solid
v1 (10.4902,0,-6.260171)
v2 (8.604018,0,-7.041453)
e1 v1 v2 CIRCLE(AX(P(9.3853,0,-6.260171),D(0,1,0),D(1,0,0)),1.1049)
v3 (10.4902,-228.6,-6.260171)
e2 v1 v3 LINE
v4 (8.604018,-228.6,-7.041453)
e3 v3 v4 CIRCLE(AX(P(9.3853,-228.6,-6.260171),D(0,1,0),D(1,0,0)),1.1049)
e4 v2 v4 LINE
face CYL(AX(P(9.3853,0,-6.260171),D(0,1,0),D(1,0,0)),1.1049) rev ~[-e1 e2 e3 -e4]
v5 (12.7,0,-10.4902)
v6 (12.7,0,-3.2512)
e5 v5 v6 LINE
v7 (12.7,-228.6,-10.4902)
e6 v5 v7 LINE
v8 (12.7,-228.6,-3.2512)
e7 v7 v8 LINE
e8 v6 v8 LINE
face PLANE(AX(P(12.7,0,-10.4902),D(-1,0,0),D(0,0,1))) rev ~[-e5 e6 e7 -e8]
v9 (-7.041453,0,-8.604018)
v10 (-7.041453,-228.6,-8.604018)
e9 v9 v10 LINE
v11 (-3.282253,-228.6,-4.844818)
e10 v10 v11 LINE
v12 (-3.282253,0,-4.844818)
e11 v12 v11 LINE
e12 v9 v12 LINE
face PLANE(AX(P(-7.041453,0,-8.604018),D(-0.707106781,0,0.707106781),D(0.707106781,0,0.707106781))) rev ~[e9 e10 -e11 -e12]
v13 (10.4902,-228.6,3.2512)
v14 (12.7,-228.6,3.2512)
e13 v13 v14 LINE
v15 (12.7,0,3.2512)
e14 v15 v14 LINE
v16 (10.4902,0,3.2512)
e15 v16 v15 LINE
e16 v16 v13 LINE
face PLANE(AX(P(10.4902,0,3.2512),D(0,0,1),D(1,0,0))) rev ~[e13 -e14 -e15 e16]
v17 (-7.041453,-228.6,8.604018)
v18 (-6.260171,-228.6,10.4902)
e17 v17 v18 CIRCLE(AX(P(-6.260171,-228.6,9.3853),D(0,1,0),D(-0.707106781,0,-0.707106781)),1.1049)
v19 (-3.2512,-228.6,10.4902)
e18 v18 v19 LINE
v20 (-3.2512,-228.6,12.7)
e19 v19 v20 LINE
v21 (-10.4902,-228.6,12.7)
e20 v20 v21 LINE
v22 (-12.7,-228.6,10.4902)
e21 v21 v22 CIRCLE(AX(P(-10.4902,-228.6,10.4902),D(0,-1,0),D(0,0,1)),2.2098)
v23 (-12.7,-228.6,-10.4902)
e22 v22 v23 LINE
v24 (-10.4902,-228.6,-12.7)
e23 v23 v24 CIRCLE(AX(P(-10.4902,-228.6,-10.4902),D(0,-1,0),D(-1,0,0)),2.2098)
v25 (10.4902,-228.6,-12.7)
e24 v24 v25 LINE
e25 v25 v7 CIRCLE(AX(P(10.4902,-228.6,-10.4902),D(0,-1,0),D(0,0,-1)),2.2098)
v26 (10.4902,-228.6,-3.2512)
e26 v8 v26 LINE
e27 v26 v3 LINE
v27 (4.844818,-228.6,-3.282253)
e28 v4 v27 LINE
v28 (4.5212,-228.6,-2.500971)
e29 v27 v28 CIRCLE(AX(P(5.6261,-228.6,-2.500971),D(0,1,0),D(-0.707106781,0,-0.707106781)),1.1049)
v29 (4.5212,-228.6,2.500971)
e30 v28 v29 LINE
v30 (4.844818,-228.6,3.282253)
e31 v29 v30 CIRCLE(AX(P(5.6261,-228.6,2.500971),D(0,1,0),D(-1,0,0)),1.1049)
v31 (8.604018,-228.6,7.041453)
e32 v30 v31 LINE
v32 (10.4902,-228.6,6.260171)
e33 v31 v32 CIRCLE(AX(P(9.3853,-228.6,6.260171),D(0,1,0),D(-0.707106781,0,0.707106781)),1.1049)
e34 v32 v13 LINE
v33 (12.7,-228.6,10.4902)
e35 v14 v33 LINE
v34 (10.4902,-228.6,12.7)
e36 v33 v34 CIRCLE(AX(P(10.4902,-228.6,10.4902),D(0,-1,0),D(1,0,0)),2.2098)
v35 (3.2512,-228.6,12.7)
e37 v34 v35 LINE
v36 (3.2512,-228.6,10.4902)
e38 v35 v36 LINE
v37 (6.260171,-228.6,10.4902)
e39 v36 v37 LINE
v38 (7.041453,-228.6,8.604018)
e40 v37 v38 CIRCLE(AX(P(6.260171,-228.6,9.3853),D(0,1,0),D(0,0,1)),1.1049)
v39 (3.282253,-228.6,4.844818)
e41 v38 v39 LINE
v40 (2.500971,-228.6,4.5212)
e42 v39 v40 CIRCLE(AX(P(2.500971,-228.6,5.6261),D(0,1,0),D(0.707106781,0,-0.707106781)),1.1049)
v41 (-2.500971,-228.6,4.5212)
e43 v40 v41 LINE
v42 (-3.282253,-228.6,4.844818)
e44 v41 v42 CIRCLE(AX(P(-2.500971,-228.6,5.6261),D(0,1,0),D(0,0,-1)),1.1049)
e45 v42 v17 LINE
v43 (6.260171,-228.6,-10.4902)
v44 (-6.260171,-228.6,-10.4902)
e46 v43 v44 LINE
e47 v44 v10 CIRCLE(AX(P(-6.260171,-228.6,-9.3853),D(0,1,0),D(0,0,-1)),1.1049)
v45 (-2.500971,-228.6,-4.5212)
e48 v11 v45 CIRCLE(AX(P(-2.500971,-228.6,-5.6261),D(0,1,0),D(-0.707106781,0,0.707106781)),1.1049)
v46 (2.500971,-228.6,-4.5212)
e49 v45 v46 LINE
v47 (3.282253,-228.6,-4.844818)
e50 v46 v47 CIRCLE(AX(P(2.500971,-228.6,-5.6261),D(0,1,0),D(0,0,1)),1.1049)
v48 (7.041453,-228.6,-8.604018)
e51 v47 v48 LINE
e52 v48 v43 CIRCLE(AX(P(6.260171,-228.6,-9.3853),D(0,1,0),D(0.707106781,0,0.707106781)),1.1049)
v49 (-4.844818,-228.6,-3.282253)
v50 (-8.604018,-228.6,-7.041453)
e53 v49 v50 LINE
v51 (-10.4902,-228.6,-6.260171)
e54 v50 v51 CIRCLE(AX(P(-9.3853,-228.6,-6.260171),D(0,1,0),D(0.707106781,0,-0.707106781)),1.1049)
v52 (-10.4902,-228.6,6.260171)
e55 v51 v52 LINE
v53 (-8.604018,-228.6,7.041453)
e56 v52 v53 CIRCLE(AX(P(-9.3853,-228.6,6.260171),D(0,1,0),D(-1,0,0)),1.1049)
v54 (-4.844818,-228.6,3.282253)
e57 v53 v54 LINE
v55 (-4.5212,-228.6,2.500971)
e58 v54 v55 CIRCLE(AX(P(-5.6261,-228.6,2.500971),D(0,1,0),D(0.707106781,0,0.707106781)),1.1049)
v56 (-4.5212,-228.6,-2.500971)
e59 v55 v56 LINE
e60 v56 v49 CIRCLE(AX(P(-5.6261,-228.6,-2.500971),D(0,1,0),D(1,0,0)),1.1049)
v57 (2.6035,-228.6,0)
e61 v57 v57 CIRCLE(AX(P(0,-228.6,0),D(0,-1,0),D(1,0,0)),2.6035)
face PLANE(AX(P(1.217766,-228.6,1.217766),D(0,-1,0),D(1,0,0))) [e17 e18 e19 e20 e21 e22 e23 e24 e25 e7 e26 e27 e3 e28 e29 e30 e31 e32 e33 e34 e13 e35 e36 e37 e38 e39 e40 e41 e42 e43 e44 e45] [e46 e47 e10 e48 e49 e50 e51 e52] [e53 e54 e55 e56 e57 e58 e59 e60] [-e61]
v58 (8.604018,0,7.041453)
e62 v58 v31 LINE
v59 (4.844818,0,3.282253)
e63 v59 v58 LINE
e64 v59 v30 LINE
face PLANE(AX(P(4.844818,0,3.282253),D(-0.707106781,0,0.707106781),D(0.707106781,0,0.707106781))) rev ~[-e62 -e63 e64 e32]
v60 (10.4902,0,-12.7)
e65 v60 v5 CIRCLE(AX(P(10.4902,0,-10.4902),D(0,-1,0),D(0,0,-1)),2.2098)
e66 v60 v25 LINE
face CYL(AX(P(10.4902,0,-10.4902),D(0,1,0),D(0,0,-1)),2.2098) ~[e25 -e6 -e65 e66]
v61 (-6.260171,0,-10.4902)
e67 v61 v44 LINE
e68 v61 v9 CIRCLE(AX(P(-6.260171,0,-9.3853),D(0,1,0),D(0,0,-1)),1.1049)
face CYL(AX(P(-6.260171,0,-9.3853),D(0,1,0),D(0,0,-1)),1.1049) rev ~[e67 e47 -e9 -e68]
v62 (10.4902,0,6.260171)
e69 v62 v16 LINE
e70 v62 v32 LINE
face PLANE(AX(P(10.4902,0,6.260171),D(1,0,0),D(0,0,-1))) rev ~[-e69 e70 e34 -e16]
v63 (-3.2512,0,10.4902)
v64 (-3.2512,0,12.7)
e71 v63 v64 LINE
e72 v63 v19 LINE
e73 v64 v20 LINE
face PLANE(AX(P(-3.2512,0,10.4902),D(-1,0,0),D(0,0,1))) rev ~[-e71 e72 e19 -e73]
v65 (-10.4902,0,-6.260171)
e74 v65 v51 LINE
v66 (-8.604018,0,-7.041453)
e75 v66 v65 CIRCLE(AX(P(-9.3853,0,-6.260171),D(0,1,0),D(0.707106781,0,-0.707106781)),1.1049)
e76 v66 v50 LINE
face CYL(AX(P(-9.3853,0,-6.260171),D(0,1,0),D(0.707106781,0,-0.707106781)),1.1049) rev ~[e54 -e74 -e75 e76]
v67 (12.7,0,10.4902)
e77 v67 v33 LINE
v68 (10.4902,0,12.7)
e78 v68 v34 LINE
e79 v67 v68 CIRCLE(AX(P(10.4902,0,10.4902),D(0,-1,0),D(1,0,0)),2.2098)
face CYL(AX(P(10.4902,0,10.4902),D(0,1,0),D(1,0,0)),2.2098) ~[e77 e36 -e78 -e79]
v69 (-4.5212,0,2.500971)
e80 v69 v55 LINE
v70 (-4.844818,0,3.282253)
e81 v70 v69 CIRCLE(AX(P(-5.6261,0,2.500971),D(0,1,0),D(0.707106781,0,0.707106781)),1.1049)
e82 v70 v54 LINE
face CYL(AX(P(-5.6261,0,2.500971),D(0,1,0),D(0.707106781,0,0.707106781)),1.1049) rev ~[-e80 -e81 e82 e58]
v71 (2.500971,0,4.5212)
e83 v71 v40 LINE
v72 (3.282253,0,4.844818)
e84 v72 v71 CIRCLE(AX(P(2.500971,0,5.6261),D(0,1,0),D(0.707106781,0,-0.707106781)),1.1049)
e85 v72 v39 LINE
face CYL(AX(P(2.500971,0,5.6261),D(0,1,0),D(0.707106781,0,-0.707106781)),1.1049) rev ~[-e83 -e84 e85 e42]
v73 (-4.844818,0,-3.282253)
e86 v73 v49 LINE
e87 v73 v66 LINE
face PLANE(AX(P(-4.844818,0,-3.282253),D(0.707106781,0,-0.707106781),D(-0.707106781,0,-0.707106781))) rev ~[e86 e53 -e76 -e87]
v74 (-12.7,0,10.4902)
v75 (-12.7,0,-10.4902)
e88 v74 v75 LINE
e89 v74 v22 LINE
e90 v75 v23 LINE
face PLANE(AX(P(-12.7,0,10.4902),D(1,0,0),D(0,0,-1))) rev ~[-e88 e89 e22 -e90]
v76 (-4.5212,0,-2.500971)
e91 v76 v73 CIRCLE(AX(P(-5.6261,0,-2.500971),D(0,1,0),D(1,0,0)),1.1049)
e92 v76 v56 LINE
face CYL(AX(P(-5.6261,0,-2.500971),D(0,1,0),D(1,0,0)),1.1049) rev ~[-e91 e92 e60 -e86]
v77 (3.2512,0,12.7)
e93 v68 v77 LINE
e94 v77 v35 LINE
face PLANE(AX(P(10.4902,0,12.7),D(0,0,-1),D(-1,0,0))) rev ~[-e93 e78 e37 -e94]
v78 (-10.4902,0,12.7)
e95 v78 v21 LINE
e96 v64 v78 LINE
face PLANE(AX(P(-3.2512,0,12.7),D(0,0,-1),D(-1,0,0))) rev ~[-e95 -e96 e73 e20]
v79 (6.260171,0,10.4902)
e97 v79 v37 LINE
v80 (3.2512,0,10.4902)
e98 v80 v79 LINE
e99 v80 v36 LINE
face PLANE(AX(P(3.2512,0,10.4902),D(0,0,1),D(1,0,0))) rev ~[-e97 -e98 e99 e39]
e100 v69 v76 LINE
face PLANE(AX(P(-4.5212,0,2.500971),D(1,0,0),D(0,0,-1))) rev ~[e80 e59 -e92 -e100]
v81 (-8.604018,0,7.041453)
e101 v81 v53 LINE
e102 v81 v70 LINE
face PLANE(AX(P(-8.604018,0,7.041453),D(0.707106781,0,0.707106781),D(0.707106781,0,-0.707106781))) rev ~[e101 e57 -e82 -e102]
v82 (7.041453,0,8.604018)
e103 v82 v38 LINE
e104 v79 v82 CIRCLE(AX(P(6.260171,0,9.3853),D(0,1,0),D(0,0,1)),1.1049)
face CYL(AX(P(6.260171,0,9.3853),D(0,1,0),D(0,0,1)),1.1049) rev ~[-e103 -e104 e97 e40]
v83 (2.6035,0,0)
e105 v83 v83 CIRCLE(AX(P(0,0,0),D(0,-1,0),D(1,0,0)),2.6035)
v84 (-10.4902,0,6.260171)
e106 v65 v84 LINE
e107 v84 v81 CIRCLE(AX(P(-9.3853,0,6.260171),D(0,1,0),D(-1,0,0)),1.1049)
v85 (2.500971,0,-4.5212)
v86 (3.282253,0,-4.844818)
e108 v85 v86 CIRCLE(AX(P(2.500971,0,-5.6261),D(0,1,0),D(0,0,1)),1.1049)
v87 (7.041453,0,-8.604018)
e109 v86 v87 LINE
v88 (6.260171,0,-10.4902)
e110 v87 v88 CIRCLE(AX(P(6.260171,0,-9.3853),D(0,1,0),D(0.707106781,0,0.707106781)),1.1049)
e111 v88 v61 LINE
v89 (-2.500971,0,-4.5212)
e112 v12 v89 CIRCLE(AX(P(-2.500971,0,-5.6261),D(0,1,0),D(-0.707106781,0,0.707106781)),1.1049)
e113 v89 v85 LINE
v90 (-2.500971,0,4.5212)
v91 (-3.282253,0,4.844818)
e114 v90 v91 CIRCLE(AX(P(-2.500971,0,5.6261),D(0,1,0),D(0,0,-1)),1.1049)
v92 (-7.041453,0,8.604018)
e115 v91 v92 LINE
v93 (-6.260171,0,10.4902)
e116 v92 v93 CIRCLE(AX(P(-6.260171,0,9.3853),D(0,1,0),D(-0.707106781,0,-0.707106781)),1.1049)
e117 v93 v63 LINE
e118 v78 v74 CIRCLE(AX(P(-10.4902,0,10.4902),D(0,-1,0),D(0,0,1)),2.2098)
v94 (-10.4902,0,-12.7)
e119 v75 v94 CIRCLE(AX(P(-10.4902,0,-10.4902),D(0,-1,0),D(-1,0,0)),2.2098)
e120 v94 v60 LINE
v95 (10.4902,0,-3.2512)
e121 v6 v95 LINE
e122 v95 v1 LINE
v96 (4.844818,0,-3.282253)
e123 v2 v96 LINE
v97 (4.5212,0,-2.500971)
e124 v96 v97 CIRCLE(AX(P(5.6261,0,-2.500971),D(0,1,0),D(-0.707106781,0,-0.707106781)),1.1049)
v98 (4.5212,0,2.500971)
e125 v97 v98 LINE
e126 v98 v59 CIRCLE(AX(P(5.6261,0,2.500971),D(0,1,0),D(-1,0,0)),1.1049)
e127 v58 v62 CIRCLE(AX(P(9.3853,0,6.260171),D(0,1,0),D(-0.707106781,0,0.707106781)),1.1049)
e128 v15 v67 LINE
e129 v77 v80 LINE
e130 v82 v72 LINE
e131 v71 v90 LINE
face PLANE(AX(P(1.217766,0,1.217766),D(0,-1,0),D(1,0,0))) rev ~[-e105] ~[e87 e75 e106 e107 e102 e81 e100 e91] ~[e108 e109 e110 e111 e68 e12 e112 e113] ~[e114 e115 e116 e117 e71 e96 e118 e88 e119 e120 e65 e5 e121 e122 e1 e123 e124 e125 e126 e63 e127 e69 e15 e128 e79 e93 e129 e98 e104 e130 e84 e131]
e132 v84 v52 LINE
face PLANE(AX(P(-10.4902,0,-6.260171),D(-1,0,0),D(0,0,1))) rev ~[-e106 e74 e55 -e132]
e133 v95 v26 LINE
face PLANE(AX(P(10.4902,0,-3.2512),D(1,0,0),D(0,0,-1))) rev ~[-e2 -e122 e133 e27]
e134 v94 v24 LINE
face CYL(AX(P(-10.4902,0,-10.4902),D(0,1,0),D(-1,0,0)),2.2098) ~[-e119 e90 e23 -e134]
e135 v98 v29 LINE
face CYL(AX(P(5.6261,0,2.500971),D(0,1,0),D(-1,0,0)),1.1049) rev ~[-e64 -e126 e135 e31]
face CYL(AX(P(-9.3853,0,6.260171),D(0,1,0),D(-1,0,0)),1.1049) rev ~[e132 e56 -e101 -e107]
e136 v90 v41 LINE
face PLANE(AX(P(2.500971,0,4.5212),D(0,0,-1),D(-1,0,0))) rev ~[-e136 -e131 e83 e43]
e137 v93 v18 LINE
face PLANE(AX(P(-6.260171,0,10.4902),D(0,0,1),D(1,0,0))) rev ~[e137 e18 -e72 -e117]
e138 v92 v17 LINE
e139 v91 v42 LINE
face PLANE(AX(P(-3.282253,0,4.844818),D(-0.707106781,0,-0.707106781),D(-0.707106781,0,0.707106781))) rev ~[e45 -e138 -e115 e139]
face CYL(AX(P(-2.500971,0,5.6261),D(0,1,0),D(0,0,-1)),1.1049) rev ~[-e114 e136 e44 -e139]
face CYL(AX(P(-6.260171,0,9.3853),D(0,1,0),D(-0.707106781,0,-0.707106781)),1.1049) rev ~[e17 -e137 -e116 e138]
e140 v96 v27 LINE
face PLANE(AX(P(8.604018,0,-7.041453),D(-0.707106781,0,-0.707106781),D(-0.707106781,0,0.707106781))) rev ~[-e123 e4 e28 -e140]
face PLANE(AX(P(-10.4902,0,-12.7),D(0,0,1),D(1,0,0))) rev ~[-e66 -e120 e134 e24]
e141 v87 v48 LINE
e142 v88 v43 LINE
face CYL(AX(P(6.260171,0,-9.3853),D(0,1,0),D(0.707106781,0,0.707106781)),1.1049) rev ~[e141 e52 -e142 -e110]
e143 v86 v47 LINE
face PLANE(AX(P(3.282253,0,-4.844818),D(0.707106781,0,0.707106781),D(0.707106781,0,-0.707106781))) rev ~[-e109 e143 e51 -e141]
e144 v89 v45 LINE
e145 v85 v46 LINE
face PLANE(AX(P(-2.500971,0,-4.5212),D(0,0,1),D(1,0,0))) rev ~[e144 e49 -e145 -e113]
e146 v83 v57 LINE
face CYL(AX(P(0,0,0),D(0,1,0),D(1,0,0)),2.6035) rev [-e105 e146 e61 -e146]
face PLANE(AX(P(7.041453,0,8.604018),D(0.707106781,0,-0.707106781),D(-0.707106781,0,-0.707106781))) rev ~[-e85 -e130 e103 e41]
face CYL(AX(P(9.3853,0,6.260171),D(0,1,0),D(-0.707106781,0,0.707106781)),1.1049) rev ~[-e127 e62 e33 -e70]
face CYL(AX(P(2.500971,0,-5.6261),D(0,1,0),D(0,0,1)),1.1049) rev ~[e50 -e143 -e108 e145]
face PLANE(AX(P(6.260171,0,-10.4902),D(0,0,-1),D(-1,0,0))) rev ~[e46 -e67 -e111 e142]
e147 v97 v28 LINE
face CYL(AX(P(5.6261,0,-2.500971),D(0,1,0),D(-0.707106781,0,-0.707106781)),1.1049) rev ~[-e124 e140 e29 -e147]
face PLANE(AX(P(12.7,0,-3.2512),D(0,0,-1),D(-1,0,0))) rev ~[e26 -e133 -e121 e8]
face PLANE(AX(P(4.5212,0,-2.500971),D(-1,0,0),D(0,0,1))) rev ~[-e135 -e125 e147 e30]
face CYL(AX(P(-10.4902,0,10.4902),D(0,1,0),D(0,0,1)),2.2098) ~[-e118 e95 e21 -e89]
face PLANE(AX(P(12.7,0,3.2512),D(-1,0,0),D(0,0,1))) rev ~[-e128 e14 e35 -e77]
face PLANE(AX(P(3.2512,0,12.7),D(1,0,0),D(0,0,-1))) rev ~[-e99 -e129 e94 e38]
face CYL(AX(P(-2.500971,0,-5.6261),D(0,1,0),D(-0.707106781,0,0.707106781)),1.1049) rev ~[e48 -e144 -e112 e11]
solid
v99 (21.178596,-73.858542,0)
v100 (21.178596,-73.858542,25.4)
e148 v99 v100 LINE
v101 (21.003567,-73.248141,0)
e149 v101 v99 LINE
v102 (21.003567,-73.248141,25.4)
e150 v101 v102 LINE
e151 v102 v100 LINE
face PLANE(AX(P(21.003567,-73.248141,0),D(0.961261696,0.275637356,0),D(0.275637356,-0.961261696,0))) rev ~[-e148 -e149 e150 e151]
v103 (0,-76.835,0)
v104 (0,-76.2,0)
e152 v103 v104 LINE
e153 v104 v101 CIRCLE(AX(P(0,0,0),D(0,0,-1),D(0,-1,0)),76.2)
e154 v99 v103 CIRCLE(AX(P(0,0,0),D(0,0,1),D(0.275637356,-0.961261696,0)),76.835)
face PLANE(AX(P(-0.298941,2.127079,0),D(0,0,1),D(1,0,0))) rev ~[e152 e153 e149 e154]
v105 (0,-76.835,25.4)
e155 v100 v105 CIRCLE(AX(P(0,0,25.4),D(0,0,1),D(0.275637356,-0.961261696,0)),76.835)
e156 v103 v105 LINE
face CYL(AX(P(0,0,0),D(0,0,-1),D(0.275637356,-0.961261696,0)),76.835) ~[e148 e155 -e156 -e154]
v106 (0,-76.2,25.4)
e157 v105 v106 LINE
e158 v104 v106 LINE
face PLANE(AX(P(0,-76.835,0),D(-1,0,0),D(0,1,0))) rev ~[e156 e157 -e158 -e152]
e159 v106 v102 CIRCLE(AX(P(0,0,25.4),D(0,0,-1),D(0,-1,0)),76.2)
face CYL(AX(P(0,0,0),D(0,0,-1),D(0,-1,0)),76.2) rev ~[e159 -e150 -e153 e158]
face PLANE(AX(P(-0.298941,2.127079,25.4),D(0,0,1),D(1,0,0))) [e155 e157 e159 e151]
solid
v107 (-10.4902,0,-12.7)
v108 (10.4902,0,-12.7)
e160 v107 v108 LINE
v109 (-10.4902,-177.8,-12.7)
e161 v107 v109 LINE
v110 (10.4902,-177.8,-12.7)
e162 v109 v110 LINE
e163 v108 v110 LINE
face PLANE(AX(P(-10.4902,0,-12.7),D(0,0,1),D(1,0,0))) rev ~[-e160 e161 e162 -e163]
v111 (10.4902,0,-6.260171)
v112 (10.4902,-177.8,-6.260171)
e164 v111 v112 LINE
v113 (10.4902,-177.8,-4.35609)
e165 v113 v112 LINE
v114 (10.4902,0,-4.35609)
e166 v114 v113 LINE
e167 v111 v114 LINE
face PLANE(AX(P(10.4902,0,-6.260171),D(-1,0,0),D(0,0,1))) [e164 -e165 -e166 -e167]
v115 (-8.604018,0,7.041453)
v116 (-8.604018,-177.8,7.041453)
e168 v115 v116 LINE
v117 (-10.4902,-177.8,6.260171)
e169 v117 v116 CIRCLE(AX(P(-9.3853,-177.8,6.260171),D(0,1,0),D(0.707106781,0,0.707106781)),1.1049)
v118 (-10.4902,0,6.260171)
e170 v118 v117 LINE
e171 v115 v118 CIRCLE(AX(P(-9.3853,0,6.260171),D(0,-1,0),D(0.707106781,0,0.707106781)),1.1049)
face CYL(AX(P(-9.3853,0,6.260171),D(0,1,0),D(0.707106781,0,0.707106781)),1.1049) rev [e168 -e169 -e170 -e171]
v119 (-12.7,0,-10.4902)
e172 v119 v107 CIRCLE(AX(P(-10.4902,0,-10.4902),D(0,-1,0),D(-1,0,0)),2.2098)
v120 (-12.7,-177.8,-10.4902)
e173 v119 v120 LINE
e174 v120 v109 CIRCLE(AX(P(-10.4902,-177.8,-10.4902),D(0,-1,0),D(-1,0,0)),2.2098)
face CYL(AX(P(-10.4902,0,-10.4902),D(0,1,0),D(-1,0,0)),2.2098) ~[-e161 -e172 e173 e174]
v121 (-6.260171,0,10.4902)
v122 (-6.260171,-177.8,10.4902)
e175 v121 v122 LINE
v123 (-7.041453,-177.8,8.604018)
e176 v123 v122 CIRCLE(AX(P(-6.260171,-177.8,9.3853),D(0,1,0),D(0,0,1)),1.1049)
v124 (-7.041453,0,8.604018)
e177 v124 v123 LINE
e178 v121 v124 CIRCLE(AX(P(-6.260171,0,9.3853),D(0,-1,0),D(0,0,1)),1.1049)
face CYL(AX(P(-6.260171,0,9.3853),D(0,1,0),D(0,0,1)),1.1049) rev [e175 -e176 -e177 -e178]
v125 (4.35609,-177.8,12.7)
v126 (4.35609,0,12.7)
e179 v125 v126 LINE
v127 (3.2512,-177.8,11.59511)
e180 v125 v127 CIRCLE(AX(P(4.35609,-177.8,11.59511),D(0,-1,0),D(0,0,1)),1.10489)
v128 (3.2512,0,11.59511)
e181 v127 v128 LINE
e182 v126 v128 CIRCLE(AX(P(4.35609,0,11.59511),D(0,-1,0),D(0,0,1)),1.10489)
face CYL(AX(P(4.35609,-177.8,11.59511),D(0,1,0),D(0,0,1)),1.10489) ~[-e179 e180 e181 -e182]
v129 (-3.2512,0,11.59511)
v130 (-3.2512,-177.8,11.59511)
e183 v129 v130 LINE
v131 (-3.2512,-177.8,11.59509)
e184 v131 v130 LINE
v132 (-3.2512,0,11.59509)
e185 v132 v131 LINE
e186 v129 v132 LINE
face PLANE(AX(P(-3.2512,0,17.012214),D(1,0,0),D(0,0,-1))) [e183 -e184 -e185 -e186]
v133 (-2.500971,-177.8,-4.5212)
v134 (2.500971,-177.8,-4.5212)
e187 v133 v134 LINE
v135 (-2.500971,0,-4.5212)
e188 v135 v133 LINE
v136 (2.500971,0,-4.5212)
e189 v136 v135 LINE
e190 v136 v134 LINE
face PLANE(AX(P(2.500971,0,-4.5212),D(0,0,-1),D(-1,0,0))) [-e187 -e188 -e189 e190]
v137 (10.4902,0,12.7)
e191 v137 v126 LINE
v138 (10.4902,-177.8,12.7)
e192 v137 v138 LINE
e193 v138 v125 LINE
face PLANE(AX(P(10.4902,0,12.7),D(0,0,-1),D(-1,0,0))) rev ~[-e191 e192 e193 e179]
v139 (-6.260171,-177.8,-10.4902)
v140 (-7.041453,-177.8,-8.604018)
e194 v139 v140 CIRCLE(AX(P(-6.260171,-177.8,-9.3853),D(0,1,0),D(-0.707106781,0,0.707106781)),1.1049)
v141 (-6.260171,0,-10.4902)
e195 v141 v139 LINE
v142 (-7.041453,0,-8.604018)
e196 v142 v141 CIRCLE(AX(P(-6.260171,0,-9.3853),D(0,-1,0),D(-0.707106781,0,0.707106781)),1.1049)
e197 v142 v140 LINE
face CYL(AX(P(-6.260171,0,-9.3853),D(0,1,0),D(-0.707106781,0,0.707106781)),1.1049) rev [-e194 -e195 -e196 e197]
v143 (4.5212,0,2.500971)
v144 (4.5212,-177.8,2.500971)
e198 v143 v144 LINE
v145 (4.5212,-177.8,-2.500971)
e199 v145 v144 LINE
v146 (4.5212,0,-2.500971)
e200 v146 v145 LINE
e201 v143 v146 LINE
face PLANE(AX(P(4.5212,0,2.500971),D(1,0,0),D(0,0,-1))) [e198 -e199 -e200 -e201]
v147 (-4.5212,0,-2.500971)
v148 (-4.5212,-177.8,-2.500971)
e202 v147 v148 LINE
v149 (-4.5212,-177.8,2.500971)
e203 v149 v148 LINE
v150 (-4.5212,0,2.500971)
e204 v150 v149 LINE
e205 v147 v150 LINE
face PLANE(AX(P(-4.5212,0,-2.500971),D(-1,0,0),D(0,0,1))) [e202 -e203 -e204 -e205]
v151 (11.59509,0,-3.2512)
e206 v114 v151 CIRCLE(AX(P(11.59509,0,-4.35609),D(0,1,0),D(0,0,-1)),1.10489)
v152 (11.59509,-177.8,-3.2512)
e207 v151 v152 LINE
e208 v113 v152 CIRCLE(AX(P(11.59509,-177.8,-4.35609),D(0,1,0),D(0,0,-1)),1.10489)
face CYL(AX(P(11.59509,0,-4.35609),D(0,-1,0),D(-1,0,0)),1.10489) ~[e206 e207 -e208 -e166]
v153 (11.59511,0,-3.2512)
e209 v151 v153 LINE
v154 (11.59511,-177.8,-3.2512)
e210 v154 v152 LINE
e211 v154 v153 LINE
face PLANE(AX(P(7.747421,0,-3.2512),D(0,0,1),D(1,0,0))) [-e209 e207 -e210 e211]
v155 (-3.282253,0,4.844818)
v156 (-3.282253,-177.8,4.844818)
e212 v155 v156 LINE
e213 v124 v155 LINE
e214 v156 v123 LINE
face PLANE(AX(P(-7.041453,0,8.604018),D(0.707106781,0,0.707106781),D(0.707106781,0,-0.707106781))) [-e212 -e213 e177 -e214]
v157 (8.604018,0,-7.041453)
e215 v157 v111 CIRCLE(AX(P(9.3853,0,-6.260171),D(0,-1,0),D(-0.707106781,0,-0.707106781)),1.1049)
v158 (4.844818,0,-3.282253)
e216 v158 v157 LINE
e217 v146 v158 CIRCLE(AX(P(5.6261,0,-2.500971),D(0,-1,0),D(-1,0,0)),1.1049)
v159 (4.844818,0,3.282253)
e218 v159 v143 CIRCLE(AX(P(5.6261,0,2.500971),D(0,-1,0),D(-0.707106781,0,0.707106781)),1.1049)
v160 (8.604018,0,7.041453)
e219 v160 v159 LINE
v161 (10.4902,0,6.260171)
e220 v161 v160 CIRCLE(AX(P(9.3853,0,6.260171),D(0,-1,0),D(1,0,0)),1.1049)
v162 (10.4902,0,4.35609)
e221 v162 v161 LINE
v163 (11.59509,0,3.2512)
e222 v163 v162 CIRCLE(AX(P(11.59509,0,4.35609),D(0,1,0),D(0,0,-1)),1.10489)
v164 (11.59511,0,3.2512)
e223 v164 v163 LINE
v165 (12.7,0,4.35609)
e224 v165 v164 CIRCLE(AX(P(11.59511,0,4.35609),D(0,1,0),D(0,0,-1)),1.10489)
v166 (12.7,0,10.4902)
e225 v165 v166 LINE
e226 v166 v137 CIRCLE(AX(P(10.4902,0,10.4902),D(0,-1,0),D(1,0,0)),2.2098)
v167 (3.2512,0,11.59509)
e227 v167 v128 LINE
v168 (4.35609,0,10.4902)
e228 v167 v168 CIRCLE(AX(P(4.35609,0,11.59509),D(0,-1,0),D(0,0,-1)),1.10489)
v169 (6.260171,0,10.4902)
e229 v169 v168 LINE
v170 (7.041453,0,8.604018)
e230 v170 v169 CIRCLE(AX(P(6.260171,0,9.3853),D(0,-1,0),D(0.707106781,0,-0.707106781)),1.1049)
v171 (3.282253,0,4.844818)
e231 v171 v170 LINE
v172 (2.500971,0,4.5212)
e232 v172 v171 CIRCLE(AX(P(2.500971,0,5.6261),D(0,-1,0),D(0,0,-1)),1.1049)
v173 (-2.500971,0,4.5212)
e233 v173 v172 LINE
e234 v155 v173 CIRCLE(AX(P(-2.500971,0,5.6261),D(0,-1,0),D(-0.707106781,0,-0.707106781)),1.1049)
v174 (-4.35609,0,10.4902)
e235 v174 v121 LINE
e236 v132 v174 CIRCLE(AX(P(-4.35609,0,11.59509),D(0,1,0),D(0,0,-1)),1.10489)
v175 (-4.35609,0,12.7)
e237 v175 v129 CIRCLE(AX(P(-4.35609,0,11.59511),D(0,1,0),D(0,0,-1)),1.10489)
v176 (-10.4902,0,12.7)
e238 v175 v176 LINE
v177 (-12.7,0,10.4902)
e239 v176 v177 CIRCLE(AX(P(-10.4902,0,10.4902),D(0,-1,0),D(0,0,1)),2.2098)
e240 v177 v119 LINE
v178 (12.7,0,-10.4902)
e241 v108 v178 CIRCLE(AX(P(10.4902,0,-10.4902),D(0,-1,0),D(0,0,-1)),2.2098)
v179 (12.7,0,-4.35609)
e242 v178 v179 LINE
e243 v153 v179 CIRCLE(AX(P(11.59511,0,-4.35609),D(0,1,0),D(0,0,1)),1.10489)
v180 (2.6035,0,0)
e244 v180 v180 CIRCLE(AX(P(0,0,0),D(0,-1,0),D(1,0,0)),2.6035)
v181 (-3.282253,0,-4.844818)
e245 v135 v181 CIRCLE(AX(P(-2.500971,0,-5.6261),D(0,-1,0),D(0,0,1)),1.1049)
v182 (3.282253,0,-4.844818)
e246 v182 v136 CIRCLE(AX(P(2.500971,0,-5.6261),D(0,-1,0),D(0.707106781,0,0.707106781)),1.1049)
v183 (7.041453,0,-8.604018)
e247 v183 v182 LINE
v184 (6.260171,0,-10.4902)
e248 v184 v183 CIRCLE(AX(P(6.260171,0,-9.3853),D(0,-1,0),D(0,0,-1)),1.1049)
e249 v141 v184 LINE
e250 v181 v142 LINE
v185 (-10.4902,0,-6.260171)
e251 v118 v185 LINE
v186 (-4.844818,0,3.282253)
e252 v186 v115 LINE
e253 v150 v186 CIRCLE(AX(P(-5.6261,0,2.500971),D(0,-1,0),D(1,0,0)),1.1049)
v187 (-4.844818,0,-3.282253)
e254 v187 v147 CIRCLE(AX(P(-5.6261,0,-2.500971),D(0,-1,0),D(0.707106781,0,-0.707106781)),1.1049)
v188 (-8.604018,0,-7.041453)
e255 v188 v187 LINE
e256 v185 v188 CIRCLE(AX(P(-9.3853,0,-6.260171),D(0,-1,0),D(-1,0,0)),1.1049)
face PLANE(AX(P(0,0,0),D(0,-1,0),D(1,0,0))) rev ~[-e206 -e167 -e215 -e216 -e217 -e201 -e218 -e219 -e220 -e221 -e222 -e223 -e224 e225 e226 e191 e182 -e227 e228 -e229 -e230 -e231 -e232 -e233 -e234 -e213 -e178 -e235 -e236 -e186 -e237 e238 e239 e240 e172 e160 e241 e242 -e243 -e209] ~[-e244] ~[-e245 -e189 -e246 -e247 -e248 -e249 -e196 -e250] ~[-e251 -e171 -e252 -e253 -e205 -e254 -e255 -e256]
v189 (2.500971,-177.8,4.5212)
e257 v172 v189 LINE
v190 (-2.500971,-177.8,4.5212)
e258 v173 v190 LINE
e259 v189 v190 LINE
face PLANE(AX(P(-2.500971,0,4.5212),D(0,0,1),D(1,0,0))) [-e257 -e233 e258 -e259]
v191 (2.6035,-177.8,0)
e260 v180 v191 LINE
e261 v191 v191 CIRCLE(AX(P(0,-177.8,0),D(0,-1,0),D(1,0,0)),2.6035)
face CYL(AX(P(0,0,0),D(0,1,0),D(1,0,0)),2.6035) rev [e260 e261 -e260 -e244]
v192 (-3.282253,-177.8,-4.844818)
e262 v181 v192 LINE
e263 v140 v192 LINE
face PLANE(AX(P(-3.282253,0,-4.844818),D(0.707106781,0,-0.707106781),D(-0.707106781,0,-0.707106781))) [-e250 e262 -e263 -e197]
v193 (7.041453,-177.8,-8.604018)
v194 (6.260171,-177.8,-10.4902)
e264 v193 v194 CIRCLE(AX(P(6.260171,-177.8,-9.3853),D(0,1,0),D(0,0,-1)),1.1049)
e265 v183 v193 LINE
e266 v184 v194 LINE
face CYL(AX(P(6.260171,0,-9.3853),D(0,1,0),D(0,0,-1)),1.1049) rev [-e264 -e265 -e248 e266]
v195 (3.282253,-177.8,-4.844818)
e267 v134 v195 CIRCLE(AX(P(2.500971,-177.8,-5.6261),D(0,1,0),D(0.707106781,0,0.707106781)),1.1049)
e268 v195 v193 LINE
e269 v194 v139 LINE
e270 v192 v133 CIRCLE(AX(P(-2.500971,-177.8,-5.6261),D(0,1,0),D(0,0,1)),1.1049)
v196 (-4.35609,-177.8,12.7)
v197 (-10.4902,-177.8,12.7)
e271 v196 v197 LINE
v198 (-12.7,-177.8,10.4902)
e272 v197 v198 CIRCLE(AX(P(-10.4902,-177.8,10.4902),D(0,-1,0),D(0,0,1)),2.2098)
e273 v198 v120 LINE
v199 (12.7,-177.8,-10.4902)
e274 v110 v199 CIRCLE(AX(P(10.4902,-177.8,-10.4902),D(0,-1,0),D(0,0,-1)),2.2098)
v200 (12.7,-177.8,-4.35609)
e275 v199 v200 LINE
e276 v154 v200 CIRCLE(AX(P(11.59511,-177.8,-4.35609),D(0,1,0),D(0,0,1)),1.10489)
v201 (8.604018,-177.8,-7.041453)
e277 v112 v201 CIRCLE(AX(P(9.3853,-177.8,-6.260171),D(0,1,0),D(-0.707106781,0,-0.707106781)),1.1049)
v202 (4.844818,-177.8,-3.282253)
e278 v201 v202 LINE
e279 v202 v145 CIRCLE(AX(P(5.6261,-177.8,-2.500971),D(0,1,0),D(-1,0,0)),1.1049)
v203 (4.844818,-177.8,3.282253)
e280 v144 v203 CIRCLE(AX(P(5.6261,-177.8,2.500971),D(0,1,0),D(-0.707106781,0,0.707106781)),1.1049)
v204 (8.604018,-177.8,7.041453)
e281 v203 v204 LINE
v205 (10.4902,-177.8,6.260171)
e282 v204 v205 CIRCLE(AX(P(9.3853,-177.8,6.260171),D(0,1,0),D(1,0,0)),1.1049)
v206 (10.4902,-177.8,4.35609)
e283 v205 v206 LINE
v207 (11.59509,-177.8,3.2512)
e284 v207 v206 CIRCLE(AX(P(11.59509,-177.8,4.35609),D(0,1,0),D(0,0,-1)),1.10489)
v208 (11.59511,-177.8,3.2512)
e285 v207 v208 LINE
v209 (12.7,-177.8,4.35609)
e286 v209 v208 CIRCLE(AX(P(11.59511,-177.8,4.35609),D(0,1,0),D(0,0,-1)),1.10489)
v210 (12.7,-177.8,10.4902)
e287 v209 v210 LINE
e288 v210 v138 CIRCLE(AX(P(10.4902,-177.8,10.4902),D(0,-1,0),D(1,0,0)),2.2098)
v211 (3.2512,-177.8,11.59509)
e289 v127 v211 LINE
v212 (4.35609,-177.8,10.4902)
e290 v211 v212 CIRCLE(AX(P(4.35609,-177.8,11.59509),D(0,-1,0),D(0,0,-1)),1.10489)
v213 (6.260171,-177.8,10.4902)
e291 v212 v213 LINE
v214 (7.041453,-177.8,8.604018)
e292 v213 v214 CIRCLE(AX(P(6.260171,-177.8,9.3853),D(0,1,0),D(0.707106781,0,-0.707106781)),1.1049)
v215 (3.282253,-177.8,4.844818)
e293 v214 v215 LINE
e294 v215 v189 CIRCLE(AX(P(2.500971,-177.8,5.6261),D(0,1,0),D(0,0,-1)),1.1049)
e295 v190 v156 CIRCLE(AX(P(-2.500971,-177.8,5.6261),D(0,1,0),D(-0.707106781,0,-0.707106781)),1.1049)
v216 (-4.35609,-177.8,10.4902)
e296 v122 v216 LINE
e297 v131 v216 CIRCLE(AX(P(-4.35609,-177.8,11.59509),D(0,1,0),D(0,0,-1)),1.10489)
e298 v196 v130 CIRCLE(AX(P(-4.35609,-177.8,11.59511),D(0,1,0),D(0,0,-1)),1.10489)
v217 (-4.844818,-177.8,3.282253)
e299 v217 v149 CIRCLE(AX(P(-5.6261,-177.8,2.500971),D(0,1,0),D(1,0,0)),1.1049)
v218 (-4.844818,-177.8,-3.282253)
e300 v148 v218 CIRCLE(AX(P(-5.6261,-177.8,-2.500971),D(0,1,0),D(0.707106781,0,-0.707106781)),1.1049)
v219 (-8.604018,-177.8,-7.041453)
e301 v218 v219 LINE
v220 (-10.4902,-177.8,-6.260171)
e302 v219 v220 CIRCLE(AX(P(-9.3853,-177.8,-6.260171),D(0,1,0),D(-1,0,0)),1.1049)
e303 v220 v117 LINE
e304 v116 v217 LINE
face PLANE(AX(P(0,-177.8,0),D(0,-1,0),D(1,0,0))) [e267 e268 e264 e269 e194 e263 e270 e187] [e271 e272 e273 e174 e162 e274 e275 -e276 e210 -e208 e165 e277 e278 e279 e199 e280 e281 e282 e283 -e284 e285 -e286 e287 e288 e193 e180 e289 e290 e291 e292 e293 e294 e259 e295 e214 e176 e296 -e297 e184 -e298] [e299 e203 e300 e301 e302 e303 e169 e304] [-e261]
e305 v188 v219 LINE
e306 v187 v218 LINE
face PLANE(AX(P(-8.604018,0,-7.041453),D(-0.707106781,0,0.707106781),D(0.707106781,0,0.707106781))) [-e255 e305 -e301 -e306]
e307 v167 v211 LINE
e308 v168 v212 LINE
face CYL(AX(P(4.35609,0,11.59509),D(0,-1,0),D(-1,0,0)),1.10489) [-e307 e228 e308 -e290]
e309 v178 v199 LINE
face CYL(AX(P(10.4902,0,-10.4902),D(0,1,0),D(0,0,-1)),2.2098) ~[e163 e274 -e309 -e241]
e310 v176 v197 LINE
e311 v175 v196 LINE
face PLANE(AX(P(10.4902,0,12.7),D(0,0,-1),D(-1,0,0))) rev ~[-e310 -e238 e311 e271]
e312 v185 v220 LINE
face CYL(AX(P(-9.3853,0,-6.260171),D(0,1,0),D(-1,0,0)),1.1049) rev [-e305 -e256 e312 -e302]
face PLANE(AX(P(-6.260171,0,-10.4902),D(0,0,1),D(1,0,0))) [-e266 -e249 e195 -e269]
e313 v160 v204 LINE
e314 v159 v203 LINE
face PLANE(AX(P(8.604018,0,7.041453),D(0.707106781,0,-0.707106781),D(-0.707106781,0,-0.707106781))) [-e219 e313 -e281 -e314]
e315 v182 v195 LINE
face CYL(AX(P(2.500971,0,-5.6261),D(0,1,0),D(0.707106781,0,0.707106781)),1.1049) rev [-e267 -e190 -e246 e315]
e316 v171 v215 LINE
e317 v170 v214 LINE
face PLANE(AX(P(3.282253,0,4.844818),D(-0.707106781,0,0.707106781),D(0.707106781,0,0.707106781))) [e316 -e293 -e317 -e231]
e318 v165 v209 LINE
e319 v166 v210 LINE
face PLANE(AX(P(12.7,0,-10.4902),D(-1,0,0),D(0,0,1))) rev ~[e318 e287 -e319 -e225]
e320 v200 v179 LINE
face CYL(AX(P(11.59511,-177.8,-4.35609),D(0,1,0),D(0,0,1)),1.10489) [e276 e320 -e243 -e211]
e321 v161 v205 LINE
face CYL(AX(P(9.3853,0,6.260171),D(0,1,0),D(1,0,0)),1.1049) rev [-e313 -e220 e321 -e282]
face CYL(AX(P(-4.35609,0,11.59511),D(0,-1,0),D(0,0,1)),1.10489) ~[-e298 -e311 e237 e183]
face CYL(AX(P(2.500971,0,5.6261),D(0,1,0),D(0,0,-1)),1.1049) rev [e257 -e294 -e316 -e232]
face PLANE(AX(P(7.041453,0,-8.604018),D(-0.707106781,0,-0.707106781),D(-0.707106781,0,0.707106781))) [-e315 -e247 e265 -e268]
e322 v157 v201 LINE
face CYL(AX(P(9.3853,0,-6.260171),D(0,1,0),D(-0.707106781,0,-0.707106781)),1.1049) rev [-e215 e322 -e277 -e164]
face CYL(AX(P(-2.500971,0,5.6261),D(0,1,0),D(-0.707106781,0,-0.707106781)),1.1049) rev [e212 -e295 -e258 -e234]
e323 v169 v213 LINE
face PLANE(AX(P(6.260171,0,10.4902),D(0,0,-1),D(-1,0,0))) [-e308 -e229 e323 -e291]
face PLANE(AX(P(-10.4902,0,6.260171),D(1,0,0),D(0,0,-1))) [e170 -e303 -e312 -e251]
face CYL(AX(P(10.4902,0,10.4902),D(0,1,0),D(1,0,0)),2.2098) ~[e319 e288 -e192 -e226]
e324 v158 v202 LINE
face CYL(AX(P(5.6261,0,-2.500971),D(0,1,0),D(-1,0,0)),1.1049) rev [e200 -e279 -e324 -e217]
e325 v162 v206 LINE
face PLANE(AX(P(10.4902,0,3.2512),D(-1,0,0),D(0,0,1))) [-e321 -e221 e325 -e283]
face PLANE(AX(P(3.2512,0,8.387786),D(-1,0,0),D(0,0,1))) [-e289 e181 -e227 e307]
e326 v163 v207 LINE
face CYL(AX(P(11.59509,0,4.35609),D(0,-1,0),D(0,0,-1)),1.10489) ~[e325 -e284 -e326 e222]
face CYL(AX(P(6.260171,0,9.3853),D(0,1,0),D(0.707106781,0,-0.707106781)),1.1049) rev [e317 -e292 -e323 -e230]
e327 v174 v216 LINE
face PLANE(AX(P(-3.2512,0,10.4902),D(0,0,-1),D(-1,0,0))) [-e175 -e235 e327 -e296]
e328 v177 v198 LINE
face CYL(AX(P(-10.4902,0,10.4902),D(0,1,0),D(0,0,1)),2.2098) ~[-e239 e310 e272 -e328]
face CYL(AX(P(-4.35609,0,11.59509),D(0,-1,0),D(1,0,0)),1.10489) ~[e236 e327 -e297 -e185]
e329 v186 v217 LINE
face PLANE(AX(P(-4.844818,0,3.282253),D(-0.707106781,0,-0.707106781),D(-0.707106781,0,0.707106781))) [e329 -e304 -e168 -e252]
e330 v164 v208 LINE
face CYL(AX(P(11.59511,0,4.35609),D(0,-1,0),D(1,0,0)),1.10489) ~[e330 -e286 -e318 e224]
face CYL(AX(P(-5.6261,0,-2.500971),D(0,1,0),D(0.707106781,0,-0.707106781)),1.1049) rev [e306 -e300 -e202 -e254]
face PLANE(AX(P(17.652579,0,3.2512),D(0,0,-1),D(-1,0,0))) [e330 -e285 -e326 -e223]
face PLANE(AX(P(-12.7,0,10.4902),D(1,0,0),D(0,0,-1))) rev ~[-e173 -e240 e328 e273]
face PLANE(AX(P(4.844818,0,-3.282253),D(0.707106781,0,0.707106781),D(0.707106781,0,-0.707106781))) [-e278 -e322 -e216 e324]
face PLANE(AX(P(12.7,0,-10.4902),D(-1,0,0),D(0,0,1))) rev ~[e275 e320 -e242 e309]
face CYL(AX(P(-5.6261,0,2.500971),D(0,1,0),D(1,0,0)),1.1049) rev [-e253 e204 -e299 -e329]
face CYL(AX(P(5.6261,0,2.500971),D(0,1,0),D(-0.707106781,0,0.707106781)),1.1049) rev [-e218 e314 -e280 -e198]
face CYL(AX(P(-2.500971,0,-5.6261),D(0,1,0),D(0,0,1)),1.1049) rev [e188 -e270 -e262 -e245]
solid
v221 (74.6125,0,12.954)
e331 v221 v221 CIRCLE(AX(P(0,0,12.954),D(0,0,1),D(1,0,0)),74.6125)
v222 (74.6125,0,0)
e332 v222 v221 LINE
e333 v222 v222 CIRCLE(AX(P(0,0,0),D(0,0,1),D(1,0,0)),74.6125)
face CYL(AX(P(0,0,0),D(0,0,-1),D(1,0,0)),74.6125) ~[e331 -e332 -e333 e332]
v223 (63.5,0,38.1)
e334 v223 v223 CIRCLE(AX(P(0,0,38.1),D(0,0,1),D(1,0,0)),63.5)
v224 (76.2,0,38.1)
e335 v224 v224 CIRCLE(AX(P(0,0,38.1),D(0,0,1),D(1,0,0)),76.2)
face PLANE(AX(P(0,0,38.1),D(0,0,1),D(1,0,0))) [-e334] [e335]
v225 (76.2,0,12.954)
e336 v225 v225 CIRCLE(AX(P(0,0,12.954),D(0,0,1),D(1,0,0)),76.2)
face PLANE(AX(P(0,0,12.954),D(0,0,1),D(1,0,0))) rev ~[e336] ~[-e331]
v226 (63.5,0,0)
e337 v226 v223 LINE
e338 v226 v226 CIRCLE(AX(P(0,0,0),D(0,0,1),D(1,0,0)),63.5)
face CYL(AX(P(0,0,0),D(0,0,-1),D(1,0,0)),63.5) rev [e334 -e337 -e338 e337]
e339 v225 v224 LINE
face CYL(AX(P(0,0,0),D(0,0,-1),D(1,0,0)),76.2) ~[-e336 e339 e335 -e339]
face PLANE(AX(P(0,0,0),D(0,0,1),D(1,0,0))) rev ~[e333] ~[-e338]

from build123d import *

# Parameters (mm, degrees)
F0_R      = 2.6035
F1_DEPTH  = 228.6
F2_R      = 2.6035
F3_DEPTH  = 177.8
F4_DEPTH  = 228.601
F0_W      = 6.5024
F0_H      = 2.2098
F0_H_2    = 2.1024142881
F0_H_3    = 4.3122142881
F5_DEPTH  = 228.601
F0_W_2    = 4.9525789589
F0_H_4    = 6.5024
F0_W_3    = 2.2098
F0_W_4    = 2.7427789589
F6_DEPTH  = 228.601
F7_R      = 1.10489
F8_R      = 76.2
F8_R_2    = 63.5
F9_DEPTH  = 38.1
F10_R     = 76.2
F10_R_2   = 74.6125
F11_DEPTH = 12.954
F13_DEPTH = 25.4


# Not quite as in the source:
# - a fillet or chamfer is up to 0.001 mm smaller than in the source, because OpenCascade refuses the exact size


with BuildPart() as f1:
    # F0 (on Front) → F1 (new body)
    with BuildSketch(Plane.XZ):
        with BuildLine():
            ThreePointArc((12.7, 10.4902), (12.0527645651, 12.0527645651), (10.4902, 12.7))
            Line((10.4902, 12.7), (3.2512, 12.7))
            Line((3.2512, 12.7), (3.2512, 10.4902))
            Line((3.2512, 10.4902), (6.2601708699, 10.4902))
            ThreePointArc((6.2601708699, 10.4902), (7.2809653653, 9.8081269244), (7.0414531524, 8.6040177175))
            Line((7.0414531524, 8.6040177175), (3.2822531524, 4.8448177175))
            ThreePointArc((3.2822531524, 4.8448177175), (2.9237977943, 4.6053055045), (2.5009708699, 4.5212))
            Line((2.5009708699, 4.5212), (-2.5009708699, 4.5212))
            ThreePointArc((-2.5009708699, 4.5212), (-2.9237977943, 4.6053055045), (-3.2822531524, 4.8448177175))
            Line((-3.2822531524, 4.8448177175), (-7.0414531524, 8.6040177175))
            ThreePointArc((-7.0414531524, 8.6040177175), (-7.2809653653, 9.8081269244), (-6.2601708699, 10.4902))
            Line((-6.2601708699, 10.4902), (-3.2512, 10.4902))
            Line((-3.2512, 10.4902), (-3.2512, 12.7))
            Line((-3.2512, 12.7), (-10.4902, 12.7))
            ThreePointArc((-10.4902, 12.7), (-12.0527645651, 12.0527645651), (-12.7, 10.4902))
            Line((-12.7, 10.4902), (-12.7, -10.4902))
            ThreePointArc((-12.7, -10.4902), (-12.0527645651, -12.0527645651), (-10.4902, -12.7))
            Line((-10.4902, -12.7), (10.4902, -12.7))
            ThreePointArc((10.4902, -12.7), (12.0527645651, -12.0527645651), (12.7, -10.4902))
            Line((12.7, -10.4902), (12.7, -3.2512))
            Line((12.7, -3.2512), (10.4902, -3.2512))
            Line((10.4902, -3.2512), (10.4902, -6.2601708699))
            ThreePointArc((10.4902, -6.2601708699), (9.8081269244, -7.2809653653), (8.6040177175, -7.0414531524))
            Line((8.6040177175, -7.0414531524), (4.8448177175, -3.2822531524))
            ThreePointArc((4.8448177175, -3.2822531524), (4.6053055045, -2.9237977943), (4.5212, -2.5009708699))
            Line((4.5212, -2.5009708699), (4.5212, 2.5009708699))
            ThreePointArc((4.5212, 2.5009708699), (4.6053055045, 2.9237977943), (4.8448177175, 3.2822531524))
            Line((4.8448177175, 3.2822531524), (8.6040177175, 7.0414531524))
            ThreePointArc((8.6040177175, 7.0414531524), (9.8081269244, 7.2809653653), (10.4902, 6.2601708699))
            Line((10.4902, 6.2601708699), (10.4902, 3.2512))
            Line((10.4902, 3.2512), (12.7, 3.2512))
            Line((12.7, 3.2512), (12.7, 10.4902))
        make_face()
        with BuildLine():
            ThreePointArc((7.0414531524, -8.6040177175), (7.2809653653, -9.8081269244), (6.2601708699, -10.4902))
            Line((6.2601708699, -10.4902), (-6.2601708699, -10.4902))
            ThreePointArc((-6.2601708699, -10.4902), (-7.2809653653, -9.8081269244), (-7.0414531524, -8.6040177175))
            Line((-7.0414531524, -8.6040177175), (-3.2822531524, -4.8448177175))
            ThreePointArc((-3.2822531524, -4.8448177175), (-2.9237977943, -4.6053055045), (-2.5009708699, -4.5212))
            Line((-2.5009708699, -4.5212), (2.5009708699, -4.5212))
            ThreePointArc((2.5009708699, -4.5212), (2.9237977943, -4.6053055045), (3.2822531524, -4.8448177175))
            Line((3.2822531524, -4.8448177175), (7.0414531524, -8.6040177175))
        make_face(mode=Mode.SUBTRACT)
        with BuildLine():
            ThreePointArc((-8.6040177175, -7.0414531524), (-9.8081269244, -7.2809653653), (-10.4902, -6.2601708699))
            Line((-10.4902, -6.2601708699), (-10.4902, 6.2601708699))
            ThreePointArc((-10.4902, 6.2601708699), (-9.8081269244, 7.2809653653), (-8.6040177175, 7.0414531524))
            Line((-8.6040177175, 7.0414531524), (-4.8448177175, 3.2822531524))
            ThreePointArc((-4.8448177175, 3.2822531524), (-4.6053055045, 2.9237977943), (-4.5212, 2.5009708699))
            Line((-4.5212, 2.5009708699), (-4.5212, -2.5009708699))
            ThreePointArc((-4.5212, -2.5009708699), (-4.6053055045, -2.9237977943), (-4.8448177175, -3.2822531524))
            Line((-4.8448177175, -3.2822531524), (-8.6040177175, -7.0414531524))
        make_face(mode=Mode.SUBTRACT)
        Circle(F0_R, mode=Mode.SUBTRACT)
    extrude(amount=F1_DEPTH)


with BuildPart() as f3:
    # F2 (on Front) → F3 (new body)
    with BuildSketch(Plane.XZ):
        with BuildLine():
            ThreePointArc((12.7, 10.4902), (12.0527645651, 12.0527645651), (10.4902, 12.7))
            Line((10.4902, 12.7), (-10.4902, 12.7))
            ThreePointArc((-10.4902, 12.7), (-12.0527645651, 12.0527645651), (-12.7, 10.4902))
            Line((-12.7, 10.4902), (-12.7, -10.4902))
            ThreePointArc((-12.7, -10.4902), (-12.0527645651, -12.0527645651), (-10.4902, -12.7))
            Line((-10.4902, -12.7), (10.4902, -12.7))
            ThreePointArc((10.4902, -12.7), (12.0527645651, -12.0527645651), (12.7, -10.4902))
            Line((12.7, -10.4902), (12.7, 10.4902))
        make_face()
        Circle(F2_R, mode=Mode.SUBTRACT)
    extrude(amount=F3_DEPTH)

    # F0 (on Front) → F4 (cut, through all)
    with BuildSketch(Plane.XZ):
        with BuildLine():
            Line((6.2601708699, 10.4902), (3.2512, 10.4902))
            Line((3.2512, 10.4902), (3.2512, 8.3877857119))
            Line((3.2512, 8.3877857119), (-3.2512, 8.3877857119))
            Line((-3.2512, 8.3877857119), (-3.2512, 10.4902))
            Line((-3.2512, 10.4902), (-6.2601708699, 10.4902))
            ThreePointArc((-6.2601708699, 10.4902), (-7.2809653653, 9.8081269244), (-7.0414531524, 8.6040177175))
            Line((-7.0414531524, 8.6040177175), (-3.2822531524, 4.8448177175))
            ThreePointArc((-3.2822531524, 4.8448177175), (-2.9237977943, 4.6053055045), (-2.5009708699, 4.5212))
            Line((-2.5009708699, 4.5212), (2.5009708699, 4.5212))
            ThreePointArc((2.5009708699, 4.5212), (2.9237977943, 4.6053055045), (3.2822531524, 4.8448177175))
            Line((3.2822531524, 4.8448177175), (7.0414531524, 8.6040177175))
            ThreePointArc((7.0414531524, 8.6040177175), (7.2809653653, 9.8081269244), (6.2601708699, 10.4902))
        make_face()
        with BuildLine():
            Line((-10.4902, 6.2601708699), (-10.4902, -6.2601708699))
            ThreePointArc((-10.4902, -6.2601708699), (-9.8081269244, -7.2809653653), (-8.6040177175, -7.0414531524))
            Line((-8.6040177175, -7.0414531524), (-4.8448177175, -3.2822531524))
            ThreePointArc((-4.8448177175, -3.2822531524), (-4.6053055045, -2.9237977943), (-4.5212, -2.5009708699))
            Line((-4.5212, -2.5009708699), (-4.5212, 2.5009708699))
            ThreePointArc((-4.5212, 2.5009708699), (-4.6053055045, 2.9237977943), (-4.8448177175, 3.2822531524))
            Line((-4.8448177175, 3.2822531524), (-8.6040177175, 7.0414531524))
            ThreePointArc((-8.6040177175, 7.0414531524), (-9.8081269244, 7.2809653653), (-10.4902, 6.2601708699))
        make_face()
        with BuildLine():
            Line((7.7474210411, 3.2512), (10.4902, 3.2512))
            Line((10.4902, 3.2512), (10.4902, 6.2601708699))
            ThreePointArc((10.4902, 6.2601708699), (9.8081269244, 7.2809653653), (8.6040177175, 7.0414531524))
            Line((8.6040177175, 7.0414531524), (4.8448177175, 3.2822531524))
            ThreePointArc((4.8448177175, 3.2822531524), (4.6053055045, 2.9237977943), (4.5212, 2.5009708699))
            Line((4.5212, 2.5009708699), (4.5212, -2.5009708699))
            ThreePointArc((4.5212, -2.5009708699), (4.6053055045, -2.9237977943), (4.8448177175, -3.2822531524))
            Line((4.8448177175, -3.2822531524), (8.6040177175, -7.0414531524))
            ThreePointArc((8.6040177175, -7.0414531524), (9.8081269244, -7.2809653653), (10.4902, -6.2601708699))
            Line((10.4902, -6.2601708699), (10.4902, -3.2512))
            Line((10.4902, -3.2512), (7.7474210411, -3.2512))
            Line((7.7474210411, -3.2512), (7.7474210411, 3.2512))
        make_face()
        with BuildLine():
            Line((-6.2601708699, -10.4902), (6.2601708699, -10.4902))
            ThreePointArc((6.2601708699, -10.4902), (7.2809653653, -9.8081269244), (7.0414531524, -8.6040177175))
            Line((7.0414531524, -8.6040177175), (3.2822531524, -4.8448177175))
            ThreePointArc((3.2822531524, -4.8448177175), (2.9237977943, -4.6053055045), (2.5009708699, -4.5212))
            Line((2.5009708699, -4.5212), (-2.5009708699, -4.5212))
            ThreePointArc((-2.5009708699, -4.5212), (-2.9237977943, -4.6053055045), (-3.2822531524, -4.8448177175))
            Line((-3.2822531524, -4.8448177175), (-7.0414531524, -8.6040177175))
            ThreePointArc((-7.0414531524, -8.6040177175), (-7.2809653653, -9.8081269244), (-6.2601708699, -10.4902))
        make_face()
    extrude(amount=F4_DEPTH, mode=Mode.SUBTRACT)

    # F0 (on Front) → F5 (cut, through all)
    with BuildSketch(Plane.XZ):
        with Locations((0, 11.5951)):
            Rectangle(F0_W, F0_H)
        with Locations((0, 9.4389928559)):
            Rectangle(F0_W, F0_H_2)
        with Locations((0, 14.8561071441)):
            Rectangle(F0_W, F0_H_3)
    extrude(amount=F5_DEPTH, mode=Mode.SUBTRACT)

    # F0 (on Front) → F6 (cut, through all)
    with BuildSketch(Plane.XZ):
        with Locations((15.1762894794, 0)):
            Rectangle(F0_W_2, F0_H_4)
        with Locations((11.5951, 0)):
            Rectangle(F0_W_3, F0_H_4)
        with Locations((9.1188105206, 0)):
            Rectangle(F0_W_4, F0_H_4)
    extrude(amount=F6_DEPTH, mode=Mode.SUBTRACT)

    # F7 (radius 1.1049 in the source; OpenCascade refuses exactly that, so slightly less here)
    f7_edges = [f3.edges().sort_by_distance(p)[0] for p in [
        (-3.2512, -88.9, 12.7),
        (-3.2512, -88.9, 10.4902),
        (3.2512, -88.9, 12.7),
        (12.7, -88.9, 3.2512),
        (12.7, -88.9, -3.2512),
        (10.4902, -88.9, -3.2512),
        (3.2512, -88.9, 10.4902),
        (10.4902, -88.9, 3.2512),
    ]]
    fillet(f7_edges, radius=F7_R)


with BuildPart() as f9:
    # F8 (on Top) → F9 (new body)
    with BuildSketch(Plane.XY):
        Circle(F8_R)
        Circle(F8_R_2, mode=Mode.SUBTRACT)
    extrude(amount=F9_DEPTH)

    # F10 (on Top) → F11 (cut)
    with BuildSketch(Plane.XY):
        Circle(F10_R)
        Circle(F10_R_2, mode=Mode.SUBTRACT)
    extrude(amount=F11_DEPTH, mode=Mode.SUBTRACT)


with BuildPart() as f13:
    # F12 (on Top) → F13 (new body)
    with BuildSketch(Plane.XY):
        with BuildLine():
            ThreePointArc((0, -76.2), (-10.6049902932, 75.4584268381), (21.0035665133, -73.2481412305))
            Line((21.0035665133, -73.2481412305), (21.1785962342, -73.8585424074))
            ThreePointArc((21.1785962342, -73.8585424074), (-10.6933652123, 76.0872470618), (0, -76.835))
            Line((0, -76.835), (0, -76.2))
        make_face()
    extrude(amount=F13_DEPTH)


solid = Compound([f1.part, f3.part, f9.part, f13.part])
